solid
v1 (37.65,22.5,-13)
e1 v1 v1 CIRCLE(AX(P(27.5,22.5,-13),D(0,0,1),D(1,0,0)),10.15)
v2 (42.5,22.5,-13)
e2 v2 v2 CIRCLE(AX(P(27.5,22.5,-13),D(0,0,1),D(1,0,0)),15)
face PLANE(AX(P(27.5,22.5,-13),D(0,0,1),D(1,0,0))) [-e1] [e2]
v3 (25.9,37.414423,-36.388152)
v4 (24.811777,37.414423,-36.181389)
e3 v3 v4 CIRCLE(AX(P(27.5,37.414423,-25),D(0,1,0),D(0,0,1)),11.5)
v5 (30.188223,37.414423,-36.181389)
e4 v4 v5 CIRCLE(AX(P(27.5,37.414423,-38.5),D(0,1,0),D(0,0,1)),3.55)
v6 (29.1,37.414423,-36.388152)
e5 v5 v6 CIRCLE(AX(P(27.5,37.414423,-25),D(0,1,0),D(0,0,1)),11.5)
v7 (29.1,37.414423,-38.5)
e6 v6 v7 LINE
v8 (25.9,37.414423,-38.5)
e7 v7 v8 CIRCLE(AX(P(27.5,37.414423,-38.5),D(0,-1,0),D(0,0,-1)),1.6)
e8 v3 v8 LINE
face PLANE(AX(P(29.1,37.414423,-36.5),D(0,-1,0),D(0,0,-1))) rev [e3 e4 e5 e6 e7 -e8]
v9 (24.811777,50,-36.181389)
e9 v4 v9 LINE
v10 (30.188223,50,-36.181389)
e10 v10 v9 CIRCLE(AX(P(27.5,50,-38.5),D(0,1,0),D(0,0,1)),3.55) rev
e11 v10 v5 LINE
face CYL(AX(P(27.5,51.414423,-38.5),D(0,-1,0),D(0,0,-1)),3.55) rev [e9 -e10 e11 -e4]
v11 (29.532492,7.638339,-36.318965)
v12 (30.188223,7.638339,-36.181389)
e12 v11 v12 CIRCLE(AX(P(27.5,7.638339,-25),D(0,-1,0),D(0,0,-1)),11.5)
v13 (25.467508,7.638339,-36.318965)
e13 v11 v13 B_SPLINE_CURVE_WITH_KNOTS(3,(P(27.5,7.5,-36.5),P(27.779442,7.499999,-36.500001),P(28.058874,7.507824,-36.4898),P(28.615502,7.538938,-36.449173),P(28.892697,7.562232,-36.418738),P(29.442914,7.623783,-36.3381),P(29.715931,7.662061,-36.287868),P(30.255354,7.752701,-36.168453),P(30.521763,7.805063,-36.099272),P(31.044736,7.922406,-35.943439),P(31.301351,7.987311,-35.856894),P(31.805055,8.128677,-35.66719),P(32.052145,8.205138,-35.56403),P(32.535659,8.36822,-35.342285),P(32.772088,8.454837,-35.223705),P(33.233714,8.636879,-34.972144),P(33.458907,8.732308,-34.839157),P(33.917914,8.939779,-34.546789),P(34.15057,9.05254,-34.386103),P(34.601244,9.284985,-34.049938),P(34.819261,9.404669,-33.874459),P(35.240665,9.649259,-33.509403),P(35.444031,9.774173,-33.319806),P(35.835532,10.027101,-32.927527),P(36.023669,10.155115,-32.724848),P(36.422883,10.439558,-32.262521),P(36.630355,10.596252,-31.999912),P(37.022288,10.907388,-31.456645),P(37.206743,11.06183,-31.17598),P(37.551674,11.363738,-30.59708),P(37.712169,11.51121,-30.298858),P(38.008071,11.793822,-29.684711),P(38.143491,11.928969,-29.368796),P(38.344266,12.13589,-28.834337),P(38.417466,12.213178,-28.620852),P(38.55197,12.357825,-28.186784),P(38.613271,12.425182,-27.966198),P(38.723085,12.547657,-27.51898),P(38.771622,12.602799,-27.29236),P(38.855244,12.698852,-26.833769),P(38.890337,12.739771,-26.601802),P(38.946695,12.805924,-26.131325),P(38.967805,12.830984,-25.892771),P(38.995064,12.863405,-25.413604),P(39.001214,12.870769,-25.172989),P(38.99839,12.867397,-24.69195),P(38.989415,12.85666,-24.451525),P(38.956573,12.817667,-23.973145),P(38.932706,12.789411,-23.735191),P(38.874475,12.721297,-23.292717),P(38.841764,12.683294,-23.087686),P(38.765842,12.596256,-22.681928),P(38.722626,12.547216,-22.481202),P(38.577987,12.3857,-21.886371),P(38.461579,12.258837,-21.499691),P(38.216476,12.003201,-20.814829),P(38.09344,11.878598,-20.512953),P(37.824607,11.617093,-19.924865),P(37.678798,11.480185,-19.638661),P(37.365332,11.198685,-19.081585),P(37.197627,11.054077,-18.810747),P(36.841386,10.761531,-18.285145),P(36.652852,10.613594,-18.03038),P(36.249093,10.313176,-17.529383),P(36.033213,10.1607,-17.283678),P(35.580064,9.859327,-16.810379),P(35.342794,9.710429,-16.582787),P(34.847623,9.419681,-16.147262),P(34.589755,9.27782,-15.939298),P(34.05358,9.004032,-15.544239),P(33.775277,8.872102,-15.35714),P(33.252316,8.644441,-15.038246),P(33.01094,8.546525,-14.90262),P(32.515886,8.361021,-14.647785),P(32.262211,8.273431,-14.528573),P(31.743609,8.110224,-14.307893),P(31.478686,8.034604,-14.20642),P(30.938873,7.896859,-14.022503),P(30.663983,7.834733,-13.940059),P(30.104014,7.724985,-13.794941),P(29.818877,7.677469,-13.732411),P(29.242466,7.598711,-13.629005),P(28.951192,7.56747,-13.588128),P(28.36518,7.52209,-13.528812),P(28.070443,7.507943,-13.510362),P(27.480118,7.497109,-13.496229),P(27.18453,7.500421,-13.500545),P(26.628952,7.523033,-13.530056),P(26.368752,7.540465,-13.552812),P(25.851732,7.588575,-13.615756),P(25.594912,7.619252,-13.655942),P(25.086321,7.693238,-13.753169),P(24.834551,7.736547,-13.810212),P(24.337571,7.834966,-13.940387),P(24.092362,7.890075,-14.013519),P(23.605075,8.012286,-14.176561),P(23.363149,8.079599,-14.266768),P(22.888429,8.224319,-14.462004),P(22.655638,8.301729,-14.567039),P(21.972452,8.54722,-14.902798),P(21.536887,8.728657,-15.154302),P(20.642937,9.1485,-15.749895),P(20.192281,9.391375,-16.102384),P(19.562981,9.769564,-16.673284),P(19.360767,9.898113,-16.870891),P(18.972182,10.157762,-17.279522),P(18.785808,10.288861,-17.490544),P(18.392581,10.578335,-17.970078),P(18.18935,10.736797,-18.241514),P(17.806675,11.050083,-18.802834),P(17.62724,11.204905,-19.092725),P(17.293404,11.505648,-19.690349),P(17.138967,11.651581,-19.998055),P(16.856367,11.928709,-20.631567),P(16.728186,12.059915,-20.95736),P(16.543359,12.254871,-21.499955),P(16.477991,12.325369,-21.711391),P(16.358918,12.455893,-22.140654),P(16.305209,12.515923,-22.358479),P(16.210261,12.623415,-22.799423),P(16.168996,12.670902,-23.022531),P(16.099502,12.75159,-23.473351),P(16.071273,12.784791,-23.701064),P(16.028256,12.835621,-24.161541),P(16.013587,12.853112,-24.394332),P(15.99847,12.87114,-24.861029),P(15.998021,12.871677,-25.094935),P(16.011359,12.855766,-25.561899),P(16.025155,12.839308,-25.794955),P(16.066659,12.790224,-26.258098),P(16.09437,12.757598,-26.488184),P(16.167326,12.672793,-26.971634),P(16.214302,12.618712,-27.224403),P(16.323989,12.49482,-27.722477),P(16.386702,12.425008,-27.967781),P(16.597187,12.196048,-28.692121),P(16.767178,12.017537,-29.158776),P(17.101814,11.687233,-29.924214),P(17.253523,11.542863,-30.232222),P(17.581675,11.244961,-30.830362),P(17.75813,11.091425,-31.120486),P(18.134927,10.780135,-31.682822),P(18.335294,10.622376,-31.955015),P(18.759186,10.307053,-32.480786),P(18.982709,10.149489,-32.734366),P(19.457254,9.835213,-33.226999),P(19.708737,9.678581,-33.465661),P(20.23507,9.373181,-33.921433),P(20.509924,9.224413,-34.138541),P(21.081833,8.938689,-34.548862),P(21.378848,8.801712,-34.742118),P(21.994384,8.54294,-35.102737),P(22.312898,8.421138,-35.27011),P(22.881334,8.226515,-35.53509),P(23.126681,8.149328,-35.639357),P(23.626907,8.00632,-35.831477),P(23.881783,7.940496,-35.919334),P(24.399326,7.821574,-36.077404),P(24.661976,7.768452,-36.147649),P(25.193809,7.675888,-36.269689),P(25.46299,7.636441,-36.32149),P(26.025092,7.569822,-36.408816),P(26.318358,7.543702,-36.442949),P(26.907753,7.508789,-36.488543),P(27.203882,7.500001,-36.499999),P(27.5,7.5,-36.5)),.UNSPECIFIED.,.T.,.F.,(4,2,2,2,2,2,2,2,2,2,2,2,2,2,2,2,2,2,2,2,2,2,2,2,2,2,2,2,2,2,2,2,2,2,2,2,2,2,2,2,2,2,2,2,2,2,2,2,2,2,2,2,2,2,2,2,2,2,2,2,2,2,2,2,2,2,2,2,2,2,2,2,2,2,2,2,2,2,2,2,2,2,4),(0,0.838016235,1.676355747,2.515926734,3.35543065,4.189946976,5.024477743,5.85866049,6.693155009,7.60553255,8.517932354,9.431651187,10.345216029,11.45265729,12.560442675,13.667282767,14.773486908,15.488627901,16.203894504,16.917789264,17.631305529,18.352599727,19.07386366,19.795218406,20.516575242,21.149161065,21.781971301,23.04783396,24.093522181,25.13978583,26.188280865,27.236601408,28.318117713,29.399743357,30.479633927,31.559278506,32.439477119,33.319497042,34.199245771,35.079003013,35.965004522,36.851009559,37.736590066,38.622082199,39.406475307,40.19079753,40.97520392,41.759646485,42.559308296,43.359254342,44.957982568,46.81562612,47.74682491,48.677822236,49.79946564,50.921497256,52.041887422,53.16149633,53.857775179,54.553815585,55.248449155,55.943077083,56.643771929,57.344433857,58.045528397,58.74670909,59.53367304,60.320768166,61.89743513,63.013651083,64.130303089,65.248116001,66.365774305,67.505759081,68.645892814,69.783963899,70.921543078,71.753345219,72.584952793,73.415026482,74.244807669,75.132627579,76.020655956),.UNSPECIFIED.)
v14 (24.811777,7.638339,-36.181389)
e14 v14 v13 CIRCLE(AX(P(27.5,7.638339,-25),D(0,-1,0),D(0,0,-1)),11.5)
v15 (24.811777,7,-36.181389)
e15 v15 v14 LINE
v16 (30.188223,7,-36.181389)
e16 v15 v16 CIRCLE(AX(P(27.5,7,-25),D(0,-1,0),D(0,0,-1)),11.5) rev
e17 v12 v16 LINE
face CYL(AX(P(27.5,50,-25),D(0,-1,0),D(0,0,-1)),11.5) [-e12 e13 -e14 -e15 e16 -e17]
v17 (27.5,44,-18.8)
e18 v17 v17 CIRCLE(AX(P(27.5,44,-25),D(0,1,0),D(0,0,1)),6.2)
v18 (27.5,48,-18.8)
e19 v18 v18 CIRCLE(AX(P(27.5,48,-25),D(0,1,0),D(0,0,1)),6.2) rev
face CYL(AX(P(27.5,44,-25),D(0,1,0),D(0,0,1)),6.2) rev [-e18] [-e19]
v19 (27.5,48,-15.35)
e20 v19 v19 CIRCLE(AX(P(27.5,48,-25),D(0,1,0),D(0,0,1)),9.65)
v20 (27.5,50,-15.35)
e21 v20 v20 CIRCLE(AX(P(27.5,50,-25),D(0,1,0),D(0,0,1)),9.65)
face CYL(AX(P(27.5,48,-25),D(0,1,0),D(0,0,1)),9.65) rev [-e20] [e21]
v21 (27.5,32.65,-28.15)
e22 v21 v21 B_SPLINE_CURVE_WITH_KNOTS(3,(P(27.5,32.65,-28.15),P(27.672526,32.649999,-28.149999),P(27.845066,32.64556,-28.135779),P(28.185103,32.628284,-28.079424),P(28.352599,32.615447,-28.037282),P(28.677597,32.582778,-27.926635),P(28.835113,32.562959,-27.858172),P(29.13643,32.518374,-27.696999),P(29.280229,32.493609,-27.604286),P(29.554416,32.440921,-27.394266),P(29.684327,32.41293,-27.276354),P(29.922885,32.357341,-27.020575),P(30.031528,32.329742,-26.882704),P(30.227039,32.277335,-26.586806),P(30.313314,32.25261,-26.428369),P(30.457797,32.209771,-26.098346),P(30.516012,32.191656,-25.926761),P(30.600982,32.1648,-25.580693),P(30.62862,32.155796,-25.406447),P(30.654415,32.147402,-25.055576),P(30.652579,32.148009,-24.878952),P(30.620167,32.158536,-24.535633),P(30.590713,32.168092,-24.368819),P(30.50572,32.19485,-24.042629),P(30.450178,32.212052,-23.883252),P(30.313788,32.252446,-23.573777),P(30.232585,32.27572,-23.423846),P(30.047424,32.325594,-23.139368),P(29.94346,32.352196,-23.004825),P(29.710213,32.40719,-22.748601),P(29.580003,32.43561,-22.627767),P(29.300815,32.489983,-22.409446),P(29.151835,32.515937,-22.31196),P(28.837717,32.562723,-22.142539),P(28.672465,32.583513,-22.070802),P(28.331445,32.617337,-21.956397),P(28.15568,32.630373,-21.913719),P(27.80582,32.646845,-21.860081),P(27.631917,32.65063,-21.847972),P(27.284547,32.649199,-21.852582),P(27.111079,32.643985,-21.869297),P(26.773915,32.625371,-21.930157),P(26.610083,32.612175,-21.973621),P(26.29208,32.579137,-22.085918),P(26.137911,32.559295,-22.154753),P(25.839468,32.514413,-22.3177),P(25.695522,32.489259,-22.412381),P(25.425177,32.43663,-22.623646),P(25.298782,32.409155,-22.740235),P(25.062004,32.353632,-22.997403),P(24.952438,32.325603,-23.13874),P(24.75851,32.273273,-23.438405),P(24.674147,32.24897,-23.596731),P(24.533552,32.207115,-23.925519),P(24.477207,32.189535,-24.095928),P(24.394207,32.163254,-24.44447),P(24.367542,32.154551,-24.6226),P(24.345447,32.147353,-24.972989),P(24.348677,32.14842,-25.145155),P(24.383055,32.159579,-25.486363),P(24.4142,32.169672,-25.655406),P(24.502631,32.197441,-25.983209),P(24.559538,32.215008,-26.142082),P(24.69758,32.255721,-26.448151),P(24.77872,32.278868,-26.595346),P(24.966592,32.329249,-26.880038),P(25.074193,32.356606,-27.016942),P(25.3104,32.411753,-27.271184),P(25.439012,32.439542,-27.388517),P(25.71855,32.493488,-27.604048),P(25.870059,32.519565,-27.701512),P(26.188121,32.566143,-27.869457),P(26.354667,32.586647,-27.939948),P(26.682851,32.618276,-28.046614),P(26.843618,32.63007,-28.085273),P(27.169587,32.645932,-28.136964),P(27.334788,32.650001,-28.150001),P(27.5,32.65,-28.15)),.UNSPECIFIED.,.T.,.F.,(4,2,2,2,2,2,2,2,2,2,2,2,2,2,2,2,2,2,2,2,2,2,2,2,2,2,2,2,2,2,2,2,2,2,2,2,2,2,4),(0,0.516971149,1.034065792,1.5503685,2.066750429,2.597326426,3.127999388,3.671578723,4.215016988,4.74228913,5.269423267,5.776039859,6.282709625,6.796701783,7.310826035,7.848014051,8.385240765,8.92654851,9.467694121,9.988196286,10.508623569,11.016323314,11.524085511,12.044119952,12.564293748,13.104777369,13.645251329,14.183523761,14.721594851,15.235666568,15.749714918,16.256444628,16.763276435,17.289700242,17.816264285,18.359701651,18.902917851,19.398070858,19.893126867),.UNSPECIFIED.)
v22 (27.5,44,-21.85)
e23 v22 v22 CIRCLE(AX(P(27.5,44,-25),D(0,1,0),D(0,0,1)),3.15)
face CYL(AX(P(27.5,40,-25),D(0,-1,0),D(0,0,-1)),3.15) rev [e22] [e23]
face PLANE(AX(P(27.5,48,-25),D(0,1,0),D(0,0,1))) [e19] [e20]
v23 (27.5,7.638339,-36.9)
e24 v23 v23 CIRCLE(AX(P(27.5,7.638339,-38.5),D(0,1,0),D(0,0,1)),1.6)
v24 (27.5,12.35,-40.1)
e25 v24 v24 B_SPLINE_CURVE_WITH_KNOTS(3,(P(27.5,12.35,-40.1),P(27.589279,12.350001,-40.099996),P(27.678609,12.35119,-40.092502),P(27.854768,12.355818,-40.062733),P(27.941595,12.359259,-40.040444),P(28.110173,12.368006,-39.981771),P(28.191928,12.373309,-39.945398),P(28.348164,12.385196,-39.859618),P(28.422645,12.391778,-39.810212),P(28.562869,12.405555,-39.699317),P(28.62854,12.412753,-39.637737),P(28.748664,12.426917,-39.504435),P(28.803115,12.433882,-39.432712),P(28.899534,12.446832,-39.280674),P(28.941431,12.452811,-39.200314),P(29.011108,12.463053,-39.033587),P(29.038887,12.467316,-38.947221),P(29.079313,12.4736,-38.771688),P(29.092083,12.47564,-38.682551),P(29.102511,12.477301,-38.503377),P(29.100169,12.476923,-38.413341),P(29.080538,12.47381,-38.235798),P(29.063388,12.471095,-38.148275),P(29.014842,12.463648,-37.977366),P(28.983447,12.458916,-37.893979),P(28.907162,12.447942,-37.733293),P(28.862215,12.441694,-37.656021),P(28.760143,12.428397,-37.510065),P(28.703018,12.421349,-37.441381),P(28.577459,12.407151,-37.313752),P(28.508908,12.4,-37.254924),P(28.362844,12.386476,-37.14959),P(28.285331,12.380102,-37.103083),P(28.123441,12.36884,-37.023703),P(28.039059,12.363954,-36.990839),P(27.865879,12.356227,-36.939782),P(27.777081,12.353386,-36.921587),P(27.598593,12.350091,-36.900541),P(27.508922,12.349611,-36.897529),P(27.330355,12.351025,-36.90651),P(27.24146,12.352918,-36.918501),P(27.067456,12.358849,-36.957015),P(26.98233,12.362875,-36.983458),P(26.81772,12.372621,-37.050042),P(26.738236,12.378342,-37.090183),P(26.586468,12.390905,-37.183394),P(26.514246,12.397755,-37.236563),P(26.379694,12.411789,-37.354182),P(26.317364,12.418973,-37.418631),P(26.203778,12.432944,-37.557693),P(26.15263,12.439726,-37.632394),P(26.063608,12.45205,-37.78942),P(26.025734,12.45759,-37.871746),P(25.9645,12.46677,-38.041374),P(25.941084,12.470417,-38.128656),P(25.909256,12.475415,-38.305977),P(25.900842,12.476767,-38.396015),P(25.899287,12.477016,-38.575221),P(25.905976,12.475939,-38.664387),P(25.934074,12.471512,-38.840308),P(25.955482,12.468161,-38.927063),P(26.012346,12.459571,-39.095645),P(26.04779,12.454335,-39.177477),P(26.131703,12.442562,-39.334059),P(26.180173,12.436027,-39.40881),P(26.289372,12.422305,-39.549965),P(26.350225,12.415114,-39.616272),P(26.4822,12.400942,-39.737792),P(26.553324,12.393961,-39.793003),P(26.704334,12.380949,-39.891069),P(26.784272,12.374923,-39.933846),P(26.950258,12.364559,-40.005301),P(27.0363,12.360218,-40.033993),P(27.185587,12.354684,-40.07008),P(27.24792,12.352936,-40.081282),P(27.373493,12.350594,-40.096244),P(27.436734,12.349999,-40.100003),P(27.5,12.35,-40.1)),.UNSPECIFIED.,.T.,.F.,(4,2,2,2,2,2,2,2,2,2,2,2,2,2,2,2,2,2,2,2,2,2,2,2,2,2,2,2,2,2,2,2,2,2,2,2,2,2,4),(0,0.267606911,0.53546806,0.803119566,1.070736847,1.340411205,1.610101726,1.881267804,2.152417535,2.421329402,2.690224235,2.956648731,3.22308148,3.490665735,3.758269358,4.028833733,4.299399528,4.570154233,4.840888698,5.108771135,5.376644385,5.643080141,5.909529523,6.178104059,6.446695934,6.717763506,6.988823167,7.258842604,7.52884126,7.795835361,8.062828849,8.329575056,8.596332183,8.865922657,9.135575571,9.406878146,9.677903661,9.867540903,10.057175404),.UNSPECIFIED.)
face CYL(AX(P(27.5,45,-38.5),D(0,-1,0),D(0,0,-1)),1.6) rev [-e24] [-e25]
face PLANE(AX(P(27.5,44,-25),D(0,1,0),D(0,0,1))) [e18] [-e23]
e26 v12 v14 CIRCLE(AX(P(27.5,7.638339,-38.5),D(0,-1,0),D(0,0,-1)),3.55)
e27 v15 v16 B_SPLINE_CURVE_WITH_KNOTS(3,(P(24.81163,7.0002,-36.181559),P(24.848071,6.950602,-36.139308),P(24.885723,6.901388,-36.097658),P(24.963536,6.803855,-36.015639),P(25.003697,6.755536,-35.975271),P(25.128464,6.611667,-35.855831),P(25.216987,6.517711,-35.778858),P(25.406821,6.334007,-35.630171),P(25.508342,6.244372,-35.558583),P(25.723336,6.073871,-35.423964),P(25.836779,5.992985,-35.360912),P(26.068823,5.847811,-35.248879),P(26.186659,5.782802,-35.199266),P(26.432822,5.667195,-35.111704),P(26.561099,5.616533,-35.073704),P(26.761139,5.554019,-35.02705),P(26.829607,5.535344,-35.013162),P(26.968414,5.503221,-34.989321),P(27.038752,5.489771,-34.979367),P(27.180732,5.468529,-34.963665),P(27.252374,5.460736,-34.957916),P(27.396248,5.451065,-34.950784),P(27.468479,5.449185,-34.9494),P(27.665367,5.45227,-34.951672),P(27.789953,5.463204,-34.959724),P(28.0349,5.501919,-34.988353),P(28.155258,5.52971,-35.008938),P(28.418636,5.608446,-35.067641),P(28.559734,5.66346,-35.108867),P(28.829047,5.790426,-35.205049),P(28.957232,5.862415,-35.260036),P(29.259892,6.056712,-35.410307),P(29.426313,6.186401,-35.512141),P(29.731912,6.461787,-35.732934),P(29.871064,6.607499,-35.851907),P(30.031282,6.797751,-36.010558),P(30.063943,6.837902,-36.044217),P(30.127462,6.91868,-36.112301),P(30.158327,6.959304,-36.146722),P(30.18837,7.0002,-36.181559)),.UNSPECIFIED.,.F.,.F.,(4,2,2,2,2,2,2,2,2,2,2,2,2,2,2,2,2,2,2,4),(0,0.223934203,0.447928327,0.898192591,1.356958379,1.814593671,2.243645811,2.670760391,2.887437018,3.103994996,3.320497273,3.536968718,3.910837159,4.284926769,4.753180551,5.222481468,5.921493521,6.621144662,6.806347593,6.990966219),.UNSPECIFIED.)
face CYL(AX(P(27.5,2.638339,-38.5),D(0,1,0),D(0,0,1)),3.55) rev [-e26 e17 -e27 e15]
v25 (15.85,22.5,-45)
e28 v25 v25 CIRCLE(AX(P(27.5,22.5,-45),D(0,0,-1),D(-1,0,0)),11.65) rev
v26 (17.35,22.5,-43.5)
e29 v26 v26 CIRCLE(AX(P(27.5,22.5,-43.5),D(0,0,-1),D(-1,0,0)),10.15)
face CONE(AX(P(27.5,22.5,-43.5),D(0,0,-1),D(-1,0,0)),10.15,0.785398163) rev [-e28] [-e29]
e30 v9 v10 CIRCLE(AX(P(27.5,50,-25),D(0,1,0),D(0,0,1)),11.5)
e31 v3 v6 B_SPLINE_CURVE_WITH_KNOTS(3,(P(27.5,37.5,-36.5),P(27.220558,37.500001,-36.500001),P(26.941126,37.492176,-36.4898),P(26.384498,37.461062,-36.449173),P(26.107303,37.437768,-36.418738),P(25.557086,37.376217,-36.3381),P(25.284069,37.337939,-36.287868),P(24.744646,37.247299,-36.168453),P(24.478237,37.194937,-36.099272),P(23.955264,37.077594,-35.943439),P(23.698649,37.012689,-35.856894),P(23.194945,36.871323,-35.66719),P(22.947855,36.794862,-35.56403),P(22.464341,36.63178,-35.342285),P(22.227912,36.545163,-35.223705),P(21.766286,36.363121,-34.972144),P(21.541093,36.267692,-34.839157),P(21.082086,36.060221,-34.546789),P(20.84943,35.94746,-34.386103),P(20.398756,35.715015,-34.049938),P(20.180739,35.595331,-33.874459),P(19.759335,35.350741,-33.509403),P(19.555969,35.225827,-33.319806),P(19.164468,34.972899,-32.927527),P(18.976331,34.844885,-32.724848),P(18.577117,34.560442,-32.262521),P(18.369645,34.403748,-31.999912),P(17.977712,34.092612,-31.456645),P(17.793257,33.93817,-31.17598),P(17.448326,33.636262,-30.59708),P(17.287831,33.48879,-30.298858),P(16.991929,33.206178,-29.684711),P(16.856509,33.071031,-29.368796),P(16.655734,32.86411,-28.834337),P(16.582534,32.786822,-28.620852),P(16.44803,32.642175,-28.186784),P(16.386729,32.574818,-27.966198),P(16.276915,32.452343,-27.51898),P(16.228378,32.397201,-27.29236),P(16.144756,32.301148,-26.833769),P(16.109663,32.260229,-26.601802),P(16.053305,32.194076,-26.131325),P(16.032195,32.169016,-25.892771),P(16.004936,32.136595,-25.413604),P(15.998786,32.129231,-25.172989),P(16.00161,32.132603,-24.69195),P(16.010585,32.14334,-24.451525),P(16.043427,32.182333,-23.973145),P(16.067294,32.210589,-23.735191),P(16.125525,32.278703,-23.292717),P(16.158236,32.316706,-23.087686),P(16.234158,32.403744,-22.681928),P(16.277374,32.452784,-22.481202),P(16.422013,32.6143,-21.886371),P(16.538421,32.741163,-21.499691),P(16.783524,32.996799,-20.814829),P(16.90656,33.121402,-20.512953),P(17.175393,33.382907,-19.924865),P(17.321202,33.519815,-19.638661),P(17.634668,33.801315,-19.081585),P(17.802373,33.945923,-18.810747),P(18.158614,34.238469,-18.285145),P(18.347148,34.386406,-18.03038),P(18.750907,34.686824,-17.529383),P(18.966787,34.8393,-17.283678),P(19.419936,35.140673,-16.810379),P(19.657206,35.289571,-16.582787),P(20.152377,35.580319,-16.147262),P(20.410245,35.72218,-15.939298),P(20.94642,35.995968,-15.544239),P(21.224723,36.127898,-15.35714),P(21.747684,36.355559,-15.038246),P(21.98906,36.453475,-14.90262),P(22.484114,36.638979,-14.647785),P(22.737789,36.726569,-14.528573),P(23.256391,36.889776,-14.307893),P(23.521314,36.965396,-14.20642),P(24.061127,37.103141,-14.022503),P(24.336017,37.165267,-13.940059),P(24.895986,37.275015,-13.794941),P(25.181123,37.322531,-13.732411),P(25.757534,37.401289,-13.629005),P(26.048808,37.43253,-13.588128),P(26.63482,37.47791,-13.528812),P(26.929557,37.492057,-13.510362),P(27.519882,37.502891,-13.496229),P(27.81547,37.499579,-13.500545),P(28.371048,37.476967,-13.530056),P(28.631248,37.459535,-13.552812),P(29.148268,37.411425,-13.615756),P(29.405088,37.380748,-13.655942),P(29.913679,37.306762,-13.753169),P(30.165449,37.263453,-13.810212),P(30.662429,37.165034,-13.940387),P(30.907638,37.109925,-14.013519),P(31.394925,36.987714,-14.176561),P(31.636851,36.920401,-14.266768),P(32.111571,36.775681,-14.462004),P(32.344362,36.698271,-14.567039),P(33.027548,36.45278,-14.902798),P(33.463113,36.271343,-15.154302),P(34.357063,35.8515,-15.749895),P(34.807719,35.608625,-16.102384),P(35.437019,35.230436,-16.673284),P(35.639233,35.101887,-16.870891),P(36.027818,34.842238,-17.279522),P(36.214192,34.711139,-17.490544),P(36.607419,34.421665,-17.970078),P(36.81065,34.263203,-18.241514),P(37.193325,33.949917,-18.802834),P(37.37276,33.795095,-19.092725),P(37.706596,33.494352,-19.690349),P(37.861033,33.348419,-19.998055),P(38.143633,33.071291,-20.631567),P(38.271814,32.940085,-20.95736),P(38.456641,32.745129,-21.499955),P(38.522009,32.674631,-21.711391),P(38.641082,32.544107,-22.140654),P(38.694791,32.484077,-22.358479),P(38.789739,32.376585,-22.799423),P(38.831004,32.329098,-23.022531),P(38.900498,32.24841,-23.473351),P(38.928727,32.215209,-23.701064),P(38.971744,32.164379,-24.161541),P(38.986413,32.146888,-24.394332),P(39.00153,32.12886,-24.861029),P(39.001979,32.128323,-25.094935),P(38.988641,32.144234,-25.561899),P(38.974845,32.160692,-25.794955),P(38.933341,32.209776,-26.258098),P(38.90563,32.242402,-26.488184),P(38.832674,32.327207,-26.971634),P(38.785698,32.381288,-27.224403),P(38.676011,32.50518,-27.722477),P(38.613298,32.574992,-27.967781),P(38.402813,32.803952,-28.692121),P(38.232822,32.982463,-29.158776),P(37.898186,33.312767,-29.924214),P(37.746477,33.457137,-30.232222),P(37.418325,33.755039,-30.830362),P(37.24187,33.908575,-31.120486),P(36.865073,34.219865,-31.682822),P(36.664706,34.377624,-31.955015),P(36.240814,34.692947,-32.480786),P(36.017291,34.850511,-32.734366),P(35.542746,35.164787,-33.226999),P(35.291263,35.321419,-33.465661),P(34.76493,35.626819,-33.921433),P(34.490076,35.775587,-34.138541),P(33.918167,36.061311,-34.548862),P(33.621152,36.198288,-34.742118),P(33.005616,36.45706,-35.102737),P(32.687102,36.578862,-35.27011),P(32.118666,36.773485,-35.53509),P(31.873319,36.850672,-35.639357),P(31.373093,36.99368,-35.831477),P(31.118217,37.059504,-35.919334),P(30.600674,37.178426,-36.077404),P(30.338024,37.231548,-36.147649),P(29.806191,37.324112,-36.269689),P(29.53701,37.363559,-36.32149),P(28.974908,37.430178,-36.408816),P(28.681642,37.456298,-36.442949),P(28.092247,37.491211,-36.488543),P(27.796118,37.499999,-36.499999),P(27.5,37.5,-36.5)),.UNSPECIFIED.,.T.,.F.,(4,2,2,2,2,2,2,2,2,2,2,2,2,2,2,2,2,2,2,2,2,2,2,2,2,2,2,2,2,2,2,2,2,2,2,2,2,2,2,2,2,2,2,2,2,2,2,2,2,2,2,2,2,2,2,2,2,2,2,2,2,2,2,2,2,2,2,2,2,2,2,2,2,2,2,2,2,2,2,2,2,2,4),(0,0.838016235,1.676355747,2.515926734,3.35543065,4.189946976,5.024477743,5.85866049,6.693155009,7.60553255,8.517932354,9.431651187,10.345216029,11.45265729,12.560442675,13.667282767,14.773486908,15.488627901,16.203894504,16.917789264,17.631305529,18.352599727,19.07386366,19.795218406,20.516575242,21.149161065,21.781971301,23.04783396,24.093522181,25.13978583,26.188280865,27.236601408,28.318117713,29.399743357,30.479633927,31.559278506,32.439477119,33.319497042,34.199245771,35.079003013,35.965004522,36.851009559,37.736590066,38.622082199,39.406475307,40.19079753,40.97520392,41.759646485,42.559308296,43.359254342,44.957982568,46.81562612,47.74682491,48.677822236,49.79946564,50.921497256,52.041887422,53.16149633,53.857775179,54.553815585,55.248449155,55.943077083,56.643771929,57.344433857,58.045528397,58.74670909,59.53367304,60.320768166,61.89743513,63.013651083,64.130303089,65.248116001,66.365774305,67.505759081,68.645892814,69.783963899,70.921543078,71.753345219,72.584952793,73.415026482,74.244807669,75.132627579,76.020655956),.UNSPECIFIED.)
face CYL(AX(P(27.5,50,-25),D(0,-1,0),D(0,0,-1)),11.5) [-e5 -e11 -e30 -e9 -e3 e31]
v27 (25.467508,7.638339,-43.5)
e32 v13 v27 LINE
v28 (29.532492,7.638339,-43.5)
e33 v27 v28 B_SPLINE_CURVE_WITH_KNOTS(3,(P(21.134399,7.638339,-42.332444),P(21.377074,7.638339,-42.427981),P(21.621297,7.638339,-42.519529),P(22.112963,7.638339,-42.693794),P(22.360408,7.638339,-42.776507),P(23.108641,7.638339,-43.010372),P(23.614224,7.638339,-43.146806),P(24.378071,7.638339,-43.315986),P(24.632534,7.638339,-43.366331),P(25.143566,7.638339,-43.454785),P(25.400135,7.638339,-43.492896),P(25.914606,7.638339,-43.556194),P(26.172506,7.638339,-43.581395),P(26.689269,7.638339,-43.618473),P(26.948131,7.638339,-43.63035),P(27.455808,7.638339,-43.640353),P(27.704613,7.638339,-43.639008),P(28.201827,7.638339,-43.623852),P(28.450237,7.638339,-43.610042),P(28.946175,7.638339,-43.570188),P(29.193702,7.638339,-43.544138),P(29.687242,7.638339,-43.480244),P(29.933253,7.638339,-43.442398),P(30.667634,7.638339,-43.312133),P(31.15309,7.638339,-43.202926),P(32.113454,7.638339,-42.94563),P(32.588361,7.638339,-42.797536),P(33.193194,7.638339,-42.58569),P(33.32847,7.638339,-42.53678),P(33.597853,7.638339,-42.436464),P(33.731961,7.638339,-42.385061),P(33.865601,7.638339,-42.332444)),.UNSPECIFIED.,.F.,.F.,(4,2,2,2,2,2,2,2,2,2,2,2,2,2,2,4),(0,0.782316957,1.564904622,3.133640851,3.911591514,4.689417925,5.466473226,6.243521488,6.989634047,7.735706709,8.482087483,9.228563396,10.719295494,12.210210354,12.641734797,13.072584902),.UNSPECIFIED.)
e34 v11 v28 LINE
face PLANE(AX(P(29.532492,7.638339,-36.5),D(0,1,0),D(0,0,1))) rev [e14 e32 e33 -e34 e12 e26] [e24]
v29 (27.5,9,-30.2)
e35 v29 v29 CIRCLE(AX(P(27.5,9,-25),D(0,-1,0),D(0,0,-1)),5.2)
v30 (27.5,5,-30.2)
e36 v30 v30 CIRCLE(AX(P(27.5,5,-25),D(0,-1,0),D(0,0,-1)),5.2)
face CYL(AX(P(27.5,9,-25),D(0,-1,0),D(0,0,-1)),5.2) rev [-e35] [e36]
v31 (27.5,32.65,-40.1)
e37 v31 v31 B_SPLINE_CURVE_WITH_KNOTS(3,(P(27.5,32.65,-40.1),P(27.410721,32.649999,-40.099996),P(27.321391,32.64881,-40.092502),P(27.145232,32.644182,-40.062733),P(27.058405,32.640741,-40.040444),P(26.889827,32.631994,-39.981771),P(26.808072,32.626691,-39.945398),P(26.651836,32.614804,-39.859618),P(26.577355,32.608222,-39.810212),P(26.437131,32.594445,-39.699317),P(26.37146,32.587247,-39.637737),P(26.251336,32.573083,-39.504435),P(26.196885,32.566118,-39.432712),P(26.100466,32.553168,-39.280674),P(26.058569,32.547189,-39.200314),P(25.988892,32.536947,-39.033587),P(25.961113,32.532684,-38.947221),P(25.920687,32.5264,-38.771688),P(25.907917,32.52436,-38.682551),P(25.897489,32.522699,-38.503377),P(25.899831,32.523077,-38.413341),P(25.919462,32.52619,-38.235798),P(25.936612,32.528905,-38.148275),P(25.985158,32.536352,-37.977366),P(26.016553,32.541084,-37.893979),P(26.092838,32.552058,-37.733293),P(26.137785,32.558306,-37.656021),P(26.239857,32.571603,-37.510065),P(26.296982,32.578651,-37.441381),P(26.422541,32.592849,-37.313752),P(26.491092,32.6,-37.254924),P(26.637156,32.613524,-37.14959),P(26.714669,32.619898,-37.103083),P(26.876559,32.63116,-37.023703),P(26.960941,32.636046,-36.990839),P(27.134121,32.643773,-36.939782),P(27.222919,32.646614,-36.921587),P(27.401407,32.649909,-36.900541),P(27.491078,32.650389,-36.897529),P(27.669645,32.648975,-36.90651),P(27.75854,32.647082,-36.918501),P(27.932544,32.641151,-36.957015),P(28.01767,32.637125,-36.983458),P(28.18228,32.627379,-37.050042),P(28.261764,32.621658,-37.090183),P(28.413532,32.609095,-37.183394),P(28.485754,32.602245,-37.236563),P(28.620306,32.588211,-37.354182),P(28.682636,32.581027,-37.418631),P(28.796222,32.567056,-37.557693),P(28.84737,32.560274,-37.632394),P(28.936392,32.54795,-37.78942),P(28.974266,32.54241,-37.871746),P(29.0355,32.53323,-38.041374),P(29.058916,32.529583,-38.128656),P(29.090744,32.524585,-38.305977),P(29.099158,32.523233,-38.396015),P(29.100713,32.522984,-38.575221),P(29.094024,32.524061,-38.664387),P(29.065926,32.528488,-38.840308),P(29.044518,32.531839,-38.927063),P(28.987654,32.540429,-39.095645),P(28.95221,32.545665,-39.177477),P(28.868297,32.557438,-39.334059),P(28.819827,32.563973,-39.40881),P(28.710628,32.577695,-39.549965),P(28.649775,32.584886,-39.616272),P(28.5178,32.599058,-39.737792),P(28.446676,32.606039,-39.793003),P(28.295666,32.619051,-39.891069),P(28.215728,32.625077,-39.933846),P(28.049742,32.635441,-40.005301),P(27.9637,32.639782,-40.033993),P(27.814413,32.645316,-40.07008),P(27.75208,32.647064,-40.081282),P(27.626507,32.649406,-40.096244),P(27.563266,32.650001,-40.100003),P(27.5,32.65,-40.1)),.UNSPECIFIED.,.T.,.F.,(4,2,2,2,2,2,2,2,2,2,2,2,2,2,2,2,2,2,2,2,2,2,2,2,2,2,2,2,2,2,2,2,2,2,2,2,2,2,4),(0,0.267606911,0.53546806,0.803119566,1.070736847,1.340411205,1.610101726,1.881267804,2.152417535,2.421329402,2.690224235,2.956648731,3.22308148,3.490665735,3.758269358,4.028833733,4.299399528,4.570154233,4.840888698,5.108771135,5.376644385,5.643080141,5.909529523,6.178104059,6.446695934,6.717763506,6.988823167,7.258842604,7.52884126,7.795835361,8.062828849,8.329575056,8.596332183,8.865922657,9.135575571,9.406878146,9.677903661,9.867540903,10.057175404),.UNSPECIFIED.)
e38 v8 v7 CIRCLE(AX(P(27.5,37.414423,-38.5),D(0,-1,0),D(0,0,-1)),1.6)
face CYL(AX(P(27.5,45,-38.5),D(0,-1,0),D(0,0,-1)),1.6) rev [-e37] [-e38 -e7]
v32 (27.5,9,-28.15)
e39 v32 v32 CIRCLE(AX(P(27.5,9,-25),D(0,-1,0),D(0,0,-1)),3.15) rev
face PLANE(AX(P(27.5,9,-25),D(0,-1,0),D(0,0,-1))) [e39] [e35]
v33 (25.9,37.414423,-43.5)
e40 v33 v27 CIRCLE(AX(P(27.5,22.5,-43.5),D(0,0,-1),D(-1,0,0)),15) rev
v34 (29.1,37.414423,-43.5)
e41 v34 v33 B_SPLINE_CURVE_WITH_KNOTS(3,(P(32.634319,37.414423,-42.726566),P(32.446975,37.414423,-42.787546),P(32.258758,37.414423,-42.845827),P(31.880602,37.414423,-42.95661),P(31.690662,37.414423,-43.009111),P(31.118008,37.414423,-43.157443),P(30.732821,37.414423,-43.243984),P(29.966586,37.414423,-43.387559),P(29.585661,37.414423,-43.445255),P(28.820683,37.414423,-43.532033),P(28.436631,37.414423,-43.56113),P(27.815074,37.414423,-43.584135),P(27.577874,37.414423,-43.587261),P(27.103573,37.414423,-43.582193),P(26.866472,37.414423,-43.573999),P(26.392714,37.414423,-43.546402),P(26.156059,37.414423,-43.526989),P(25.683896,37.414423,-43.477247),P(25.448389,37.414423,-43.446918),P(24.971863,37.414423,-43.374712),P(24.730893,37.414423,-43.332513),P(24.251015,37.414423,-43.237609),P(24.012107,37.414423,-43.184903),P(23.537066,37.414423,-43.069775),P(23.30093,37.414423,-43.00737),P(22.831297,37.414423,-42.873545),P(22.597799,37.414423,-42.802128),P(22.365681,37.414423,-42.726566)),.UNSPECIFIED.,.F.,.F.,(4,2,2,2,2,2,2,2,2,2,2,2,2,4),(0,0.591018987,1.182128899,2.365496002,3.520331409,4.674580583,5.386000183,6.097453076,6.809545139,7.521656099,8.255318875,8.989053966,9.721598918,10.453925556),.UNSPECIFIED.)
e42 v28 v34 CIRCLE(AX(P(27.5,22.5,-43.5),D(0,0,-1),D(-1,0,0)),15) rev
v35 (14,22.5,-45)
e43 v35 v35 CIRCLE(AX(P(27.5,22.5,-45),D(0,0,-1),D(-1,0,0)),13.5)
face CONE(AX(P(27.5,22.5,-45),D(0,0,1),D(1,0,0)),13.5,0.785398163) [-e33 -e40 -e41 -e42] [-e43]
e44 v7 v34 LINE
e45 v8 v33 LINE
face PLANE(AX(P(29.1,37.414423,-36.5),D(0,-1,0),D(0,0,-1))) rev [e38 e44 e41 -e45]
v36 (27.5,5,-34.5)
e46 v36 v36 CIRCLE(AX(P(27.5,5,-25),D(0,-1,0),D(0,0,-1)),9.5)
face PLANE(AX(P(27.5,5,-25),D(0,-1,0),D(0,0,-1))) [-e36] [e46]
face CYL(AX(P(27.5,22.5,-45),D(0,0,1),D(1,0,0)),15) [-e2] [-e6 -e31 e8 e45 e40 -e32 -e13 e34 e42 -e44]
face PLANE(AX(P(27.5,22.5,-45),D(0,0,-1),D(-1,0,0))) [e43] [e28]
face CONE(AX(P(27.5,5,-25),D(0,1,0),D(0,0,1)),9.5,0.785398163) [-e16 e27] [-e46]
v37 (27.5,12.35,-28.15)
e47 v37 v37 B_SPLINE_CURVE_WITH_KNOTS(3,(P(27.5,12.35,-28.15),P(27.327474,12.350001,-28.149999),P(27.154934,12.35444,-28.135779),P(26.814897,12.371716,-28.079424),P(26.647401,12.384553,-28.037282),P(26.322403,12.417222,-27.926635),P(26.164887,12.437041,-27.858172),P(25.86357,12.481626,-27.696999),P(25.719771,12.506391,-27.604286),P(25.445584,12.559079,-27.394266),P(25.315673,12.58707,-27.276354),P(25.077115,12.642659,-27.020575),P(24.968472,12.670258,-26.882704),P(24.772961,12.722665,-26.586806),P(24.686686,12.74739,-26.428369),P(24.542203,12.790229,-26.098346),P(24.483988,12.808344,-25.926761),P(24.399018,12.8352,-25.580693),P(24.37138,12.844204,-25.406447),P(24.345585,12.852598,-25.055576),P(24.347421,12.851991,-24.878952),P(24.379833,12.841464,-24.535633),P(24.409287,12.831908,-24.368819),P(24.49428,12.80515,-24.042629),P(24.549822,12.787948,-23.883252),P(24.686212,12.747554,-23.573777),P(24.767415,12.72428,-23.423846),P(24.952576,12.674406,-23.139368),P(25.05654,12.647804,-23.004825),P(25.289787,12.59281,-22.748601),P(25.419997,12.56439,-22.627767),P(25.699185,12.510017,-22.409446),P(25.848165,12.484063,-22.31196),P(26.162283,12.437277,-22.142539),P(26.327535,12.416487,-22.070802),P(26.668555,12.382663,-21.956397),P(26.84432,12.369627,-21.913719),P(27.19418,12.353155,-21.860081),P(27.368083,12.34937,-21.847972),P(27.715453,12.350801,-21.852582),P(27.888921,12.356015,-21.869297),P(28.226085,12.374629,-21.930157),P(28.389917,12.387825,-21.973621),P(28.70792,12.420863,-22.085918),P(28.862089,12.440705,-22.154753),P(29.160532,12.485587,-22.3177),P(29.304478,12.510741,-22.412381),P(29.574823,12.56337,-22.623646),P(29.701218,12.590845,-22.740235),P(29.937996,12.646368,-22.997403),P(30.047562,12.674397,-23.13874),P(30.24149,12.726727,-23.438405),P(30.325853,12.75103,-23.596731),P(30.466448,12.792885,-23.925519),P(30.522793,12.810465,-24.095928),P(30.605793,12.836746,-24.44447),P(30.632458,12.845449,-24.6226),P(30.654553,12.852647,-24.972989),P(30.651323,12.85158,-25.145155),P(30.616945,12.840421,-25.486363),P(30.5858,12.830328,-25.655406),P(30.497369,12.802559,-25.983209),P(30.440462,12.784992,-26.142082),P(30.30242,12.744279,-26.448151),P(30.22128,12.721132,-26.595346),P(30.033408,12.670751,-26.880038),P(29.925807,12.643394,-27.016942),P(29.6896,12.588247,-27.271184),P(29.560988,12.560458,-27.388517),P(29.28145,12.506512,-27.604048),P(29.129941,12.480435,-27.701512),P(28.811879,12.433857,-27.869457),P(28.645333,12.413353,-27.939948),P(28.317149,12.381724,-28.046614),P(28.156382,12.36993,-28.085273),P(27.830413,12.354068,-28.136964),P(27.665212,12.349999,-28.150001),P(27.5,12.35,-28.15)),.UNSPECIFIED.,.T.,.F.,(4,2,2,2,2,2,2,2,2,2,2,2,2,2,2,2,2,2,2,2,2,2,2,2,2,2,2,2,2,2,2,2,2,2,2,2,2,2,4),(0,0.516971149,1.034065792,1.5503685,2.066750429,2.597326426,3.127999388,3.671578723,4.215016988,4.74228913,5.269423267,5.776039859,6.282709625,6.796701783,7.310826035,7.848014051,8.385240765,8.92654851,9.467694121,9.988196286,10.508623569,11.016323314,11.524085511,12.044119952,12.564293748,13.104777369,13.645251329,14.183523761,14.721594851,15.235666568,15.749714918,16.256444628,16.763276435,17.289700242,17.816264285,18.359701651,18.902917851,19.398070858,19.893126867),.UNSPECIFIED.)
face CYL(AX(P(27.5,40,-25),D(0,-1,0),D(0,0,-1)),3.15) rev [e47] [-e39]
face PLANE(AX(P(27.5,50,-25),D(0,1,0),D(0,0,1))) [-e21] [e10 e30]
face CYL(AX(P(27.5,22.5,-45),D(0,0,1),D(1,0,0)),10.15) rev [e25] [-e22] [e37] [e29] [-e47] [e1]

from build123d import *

# Parameters (mm, degrees)
EXTRUDE_1_DEPTH      = 45
SKETCH_5_R           = 7.9
EXTRUDE_3_DEPTH      = 45
CHAMFER_5_SIZE       = 8
CHAMFER_6_SIZE       = 2
FILLET_5_R           = 3
FILLET_6_R           = 2
SKETCH_7_R           = 15
SKETCH_7_R_2         = 10.15
EXTRUDE_4_DEPTH      = 45
SKETCH_6_R           = 1.6
SKETCH_6_R_2         = 3.1
CUT_EXTRUDE_4_DEPTH  = 85.113019206
SKETCH_10_R          = 11.5
EXTRUDE_5_DEPTH      = 50
FILLET_9_R           = 5
CUT_EXTRUDE_START    = -40
SKETCH_11_R          = 10.15
SKETCH_11_R_2        = 7.9
CUT_EXTRUDE_6_DEPTH  = 40
SKETCH_12_R          = 3.15
CUT_EXTRUDE_7_DEPTH  = 40
CHAMFER_9_SIZE       = 1.5
SKETCH_13_R          = 6.2
CUT_EXTRUDE_8_DEPTH  = 6
SKETCH_19_R          = 36.592880448
CUT_EXTRUDE_12_DEPTH = 87.890736042
SKETCH_20_R          = 20
CUT_EXTRUDE_13_DEPTH = 13
SKETCH_21_R          = 7.9
CUT_EXTRUDE_14_DEPTH = 74.008561269
SKETCH_22_W          = 4.064984698
SKETCH_22_H          = 0.276677518
SKETCH_22_W_2        = 3.2
SKETCH_22_H_2        = 0.1711549
CUT_EXTRUDE_15_DEPTH = 8.5
SKETCH_15_R          = 11.5
CUT_EXTRUDE_16_DEPTH = 5
SKETCH_23_R          = 5.2
CUT_EXTRUDE_17_DEPTH = 4
CHAMFER_10_SIZE      = 2
SKETCH_24_R          = 3.15
CUT_EXTRUDE_18_DEPTH = 74.159073316
SKETCH_25_R          = 9.65
CUT_EXTRUDE_19_DEPTH = 2
SKETCH_26_R          = 3.55
CUT_EXTRUDE_20_DEPTH = 14
SKETCH_27_R          = 3.55
CUT_EXTRUDE_21_DEPTH = 5


with BuildPart() as part:
    # 草图1 → 凸台-拉伸1 (new body)
    with BuildSketch(Plane(origin=(0, 0, 0), x_dir=(1, 0, 0), z_dir=(0, 1, 0))):
        with BuildLine():
            Line((0, 0), (55, 0))
            Line((55, 0), (55, -7))
            ThreePointArc((55, -7), (27.5, -34.5), (0, -7))
            Line((0, -7), (0, 0))
        make_face()
    extrude(amount=EXTRUDE_1_DEPTH)

    # 草图5 → 凸台-拉伸3 (add)
    with BuildSketch(Plane(origin=(0, 0, 0), x_dir=(-1, 0, 0), z_dir=(0, 0, -1))):
        with Locations((-27.5, 22.5)):
            Circle(SKETCH_5_R)
    extrude(amount=EXTRUDE_3_DEPTH)

    # 倒角5
    chamfer_5_edges = [part.edges().sort_by_distance(p)[0] for p in [
        (0, 45, 3.5),
        (55, 45, 3.5),
        (27.5, 45, 34.5),
        (0, 0, 3.5),
        (55, 0, 3.5),
        (27.5, 0, 34.5),
    ]]
    chamfer(chamfer_5_edges, length=CHAMFER_5_SIZE)

    # 倒角6
    chamfer_6_edges = [part.edges().sort_by_distance(p)[0] for p in [
        (4, 4, 0),
        (27.5, 0, 0),
        (51, 4, 0),
        (55, 22.5, 0),
        (51, 41, 0),
        (27.5, 45, 0),
        (4, 41, 0),
        (0, 22.5, 0),
    ]]
    chamfer(chamfer_6_edges, length=CHAMFER_6_SIZE)

    # 圆角5
    fillet_5_edges = [part.edges().sort_by_distance(p)[0] for p in [
        (35.4, 22.5, -45),
    ]]
    fillet(fillet_5_edges, radius=FILLET_5_R)

    # 圆角6
    fillet_6_edges = [part.edges().sort_by_distance(p)[0] for p in [
        (35.4, 22.5, 0),
    ]]
    fillet(fillet_6_edges, radius=FILLET_6_R)

    # 草图7 → 凸台-拉伸4 (add)
    with BuildSketch(Plane(origin=(0, 0, 0), x_dir=(-1, 0, 0), z_dir=(0, 0, -1))):
        with Locations((-27.5, 22.5)):
            Circle(SKETCH_7_R)
        with Locations((-27.5, 22.5)):
            Circle(SKETCH_7_R_2, mode=Mode.SUBTRACT)
    extrude(amount=EXTRUDE_4_DEPTH)

    # 草图6 → 切除-拉伸4 (cut, through all)
    with BuildSketch(Plane(origin=(0, 0, 0), x_dir=(1, 0, 0), z_dir=(0, 1, 0))):
        with Locations((27.5, 8.5)):
            Circle(SKETCH_6_R)
        with Locations((27.5, 25)):
            Circle(SKETCH_6_R_2)
        with Locations((27.5, 38.5)):
            Circle(SKETCH_6_R)
    extrude(amount=CUT_EXTRUDE_4_DEPTH, mode=Mode.SUBTRACT)

    # 草图10 → 凸台-拉伸5 (add)
    with BuildSketch(Plane(origin=(0, 0, 0), x_dir=(1, 0, 0), z_dir=(0, 1, 0))):
        with Locations((27.5, 25)):
            Circle(SKETCH_10_R)
    extrude(amount=EXTRUDE_5_DEPTH)

    # 圆角9
    fillet_9_edges = [part.edges().sort_by_distance(p)[0] for p in [
        (42.5, 22.5, 0),
    ]]
    fillet(fillet_9_edges, radius=FILLET_9_R)

    # 草图11 → 切除-拉伸6 (cut)
    with BuildSketch(Plane(origin=(0, 0, -45), x_dir=(-1, 0, 0), z_dir=(0, 0, -1)).offset(CUT_EXTRUDE_START)):
        with Locations((-27.5, 22.5)):
            Circle(SKETCH_11_R)
        with Locations((-27.5, 22.5)):
            Circle(SKETCH_11_R_2, mode=Mode.SUBTRACT)
    extrude(amount=CUT_EXTRUDE_6_DEPTH, mode=Mode.SUBTRACT)

    # 草图12 → 切除-拉伸7 (cut)
    with BuildSketch(Plane.XZ):
        with Locations((27.5, -25)):
            Circle(SKETCH_12_R)
    extrude(amount=-CUT_EXTRUDE_7_DEPTH, mode=Mode.SUBTRACT)

    # 倒角9
    chamfer_9_edges = [part.edges().sort_by_distance(p)[0] for p in [
        (37.65, 22.5, -45),
        (42.5, 22.5, -45),
    ]]
    chamfer(chamfer_9_edges, length=CHAMFER_9_SIZE)

    # 草图13 → 切除-拉伸8 (cut)
    with BuildSketch(Plane(origin=(0, 50, 0), x_dir=(1, 0, 0), z_dir=(0, 1, 0))):
        with Locations((27.5, 25)):
            Circle(SKETCH_13_R)
    extrude(amount=-CUT_EXTRUDE_8_DEPTH, mode=Mode.SUBTRACT)

    # 草图19 → 切除-拉伸12 (cut, through all)
    with BuildSketch(Plane(origin=(0, 0, 0), x_dir=(-1, 0, 0), z_dir=(0, 0, -1))):
        with Locations((-27.5, 22.5)):
            Circle(SKETCH_19_R)
    extrude(amount=-CUT_EXTRUDE_12_DEPTH, mode=Mode.SUBTRACT)


with BuildPart() as cut_extrude_12_piece_1:
    # of the separate pieces the step leaves, piece 1, a body of its own (cut_extrude_12_pieces)
    add(part.part.solids().sort_by_distance((12.5, 22.5, -43.5))[0])


with BuildPart() as cut_extrude_12_piece_2:
    # of the separate pieces the step leaves, piece 2, a body of its own (cut_extrude_12_pieces)
    add(part.part.solids().sort_by_distance((19.6, 22.5, -2))[0])


with BuildPart() as cut_extrude_13_tool:
    # 草图20 → 切除-拉伸13 (new body)
    with BuildSketch(Plane.XY):
        with Locations((27.5, 22.5)):
            Circle(SKETCH_20_R)
    extrude(amount=-CUT_EXTRUDE_13_DEPTH)


with BuildPart() as cut_extrude_12_piece_1_1:
    add(cut_extrude_12_piece_1.part)

    # 切除-拉伸13: cut by cut_extrude_13_tool
    add(cut_extrude_13_tool.part, mode=Mode.SUBTRACT)

    # 草图22 → 切除-拉伸15 (cut)
    with BuildSketch(Plane(origin=(0, 0, -45), x_dir=(-1, 0, 0), z_dir=(0, 0, -1))):
        with Locations((-27.5, 7.5)):
            Rectangle(SKETCH_22_W, SKETCH_22_H)
        with Locations((-27.5, 37.5)):
            Rectangle(SKETCH_22_W_2, SKETCH_22_H_2)
    extrude(amount=-CUT_EXTRUDE_15_DEPTH, mode=Mode.SUBTRACT)

    # 草图15 → 切除-拉伸16 (cut)
    with BuildSketch(Plane.XZ):
        with Locations((27.5, -25)):
            Circle(SKETCH_15_R)
    extrude(amount=-CUT_EXTRUDE_16_DEPTH, mode=Mode.SUBTRACT)

    # 草图23 → 切除-拉伸17 (cut)
    with BuildSketch(Plane.XZ.offset(-5)):
        with Locations((27.5, -25)):
            Circle(SKETCH_23_R)
    extrude(amount=-CUT_EXTRUDE_17_DEPTH, mode=Mode.SUBTRACT)

    # 倒角10
    chamfer_10_edges = [cut_extrude_12_piece_1_1.edges().sort_by_distance(p)[0] for p in [
        (16, 5, -25),
    ]]
    chamfer(chamfer_10_edges, length=CHAMFER_10_SIZE)

    # 草图24 → 切除-拉伸18 (cut, through all)
    with BuildSketch(Plane(origin=(0, 44, 0), x_dir=(1, 0, 0), z_dir=(0, 1, 0))):
        with Locations((27.5, 25)):
            Circle(SKETCH_24_R)
    extrude(amount=-CUT_EXTRUDE_18_DEPTH, mode=Mode.SUBTRACT)

    # 草图25 → 切除-拉伸19 (cut)
    with BuildSketch(Plane(origin=(0, 50, 0), x_dir=(1, 0, 0), z_dir=(0, 1, 0))):
        with Locations((27.5, 25)):
            Circle(SKETCH_25_R)
    extrude(amount=-CUT_EXTRUDE_19_DEPTH, mode=Mode.SUBTRACT)

    # 草图26 → 切除-拉伸20 (cut)
    with BuildSketch(Plane(origin=(0, 37.41442255, 0), x_dir=(1, 0, 0), z_dir=(0, 1, 0))):
        with Locations((27.5, 38.5)):
            Circle(SKETCH_26_R)
    extrude(amount=CUT_EXTRUDE_20_DEPTH, mode=Mode.SUBTRACT)

    # 草图27 → 切除-拉伸21 (cut)
    with BuildSketch(Plane.XZ.offset(-7.638338759)):
        with Locations((27.5, -38.5)):
            Circle(SKETCH_27_R)
    extrude(amount=CUT_EXTRUDE_21_DEPTH, mode=Mode.SUBTRACT)


with BuildPart() as cut_extrude_12_piece_2_1:
    add(cut_extrude_12_piece_2.part)

    # 切除-拉伸13: cut by cut_extrude_13_tool
    add(cut_extrude_13_tool.part, mode=Mode.SUBTRACT)

    # 草图21 → 切除-拉伸14 (cut, through all)
    with BuildSketch(Plane.XY.offset(-13)):
        with Locations((27.5, 22.5)):
            Circle(SKETCH_21_R)
    extrude(amount=-CUT_EXTRUDE_14_DEPTH, mode=Mode.SUBTRACT)


solid = cut_extrude_12_piece_1_1.part
